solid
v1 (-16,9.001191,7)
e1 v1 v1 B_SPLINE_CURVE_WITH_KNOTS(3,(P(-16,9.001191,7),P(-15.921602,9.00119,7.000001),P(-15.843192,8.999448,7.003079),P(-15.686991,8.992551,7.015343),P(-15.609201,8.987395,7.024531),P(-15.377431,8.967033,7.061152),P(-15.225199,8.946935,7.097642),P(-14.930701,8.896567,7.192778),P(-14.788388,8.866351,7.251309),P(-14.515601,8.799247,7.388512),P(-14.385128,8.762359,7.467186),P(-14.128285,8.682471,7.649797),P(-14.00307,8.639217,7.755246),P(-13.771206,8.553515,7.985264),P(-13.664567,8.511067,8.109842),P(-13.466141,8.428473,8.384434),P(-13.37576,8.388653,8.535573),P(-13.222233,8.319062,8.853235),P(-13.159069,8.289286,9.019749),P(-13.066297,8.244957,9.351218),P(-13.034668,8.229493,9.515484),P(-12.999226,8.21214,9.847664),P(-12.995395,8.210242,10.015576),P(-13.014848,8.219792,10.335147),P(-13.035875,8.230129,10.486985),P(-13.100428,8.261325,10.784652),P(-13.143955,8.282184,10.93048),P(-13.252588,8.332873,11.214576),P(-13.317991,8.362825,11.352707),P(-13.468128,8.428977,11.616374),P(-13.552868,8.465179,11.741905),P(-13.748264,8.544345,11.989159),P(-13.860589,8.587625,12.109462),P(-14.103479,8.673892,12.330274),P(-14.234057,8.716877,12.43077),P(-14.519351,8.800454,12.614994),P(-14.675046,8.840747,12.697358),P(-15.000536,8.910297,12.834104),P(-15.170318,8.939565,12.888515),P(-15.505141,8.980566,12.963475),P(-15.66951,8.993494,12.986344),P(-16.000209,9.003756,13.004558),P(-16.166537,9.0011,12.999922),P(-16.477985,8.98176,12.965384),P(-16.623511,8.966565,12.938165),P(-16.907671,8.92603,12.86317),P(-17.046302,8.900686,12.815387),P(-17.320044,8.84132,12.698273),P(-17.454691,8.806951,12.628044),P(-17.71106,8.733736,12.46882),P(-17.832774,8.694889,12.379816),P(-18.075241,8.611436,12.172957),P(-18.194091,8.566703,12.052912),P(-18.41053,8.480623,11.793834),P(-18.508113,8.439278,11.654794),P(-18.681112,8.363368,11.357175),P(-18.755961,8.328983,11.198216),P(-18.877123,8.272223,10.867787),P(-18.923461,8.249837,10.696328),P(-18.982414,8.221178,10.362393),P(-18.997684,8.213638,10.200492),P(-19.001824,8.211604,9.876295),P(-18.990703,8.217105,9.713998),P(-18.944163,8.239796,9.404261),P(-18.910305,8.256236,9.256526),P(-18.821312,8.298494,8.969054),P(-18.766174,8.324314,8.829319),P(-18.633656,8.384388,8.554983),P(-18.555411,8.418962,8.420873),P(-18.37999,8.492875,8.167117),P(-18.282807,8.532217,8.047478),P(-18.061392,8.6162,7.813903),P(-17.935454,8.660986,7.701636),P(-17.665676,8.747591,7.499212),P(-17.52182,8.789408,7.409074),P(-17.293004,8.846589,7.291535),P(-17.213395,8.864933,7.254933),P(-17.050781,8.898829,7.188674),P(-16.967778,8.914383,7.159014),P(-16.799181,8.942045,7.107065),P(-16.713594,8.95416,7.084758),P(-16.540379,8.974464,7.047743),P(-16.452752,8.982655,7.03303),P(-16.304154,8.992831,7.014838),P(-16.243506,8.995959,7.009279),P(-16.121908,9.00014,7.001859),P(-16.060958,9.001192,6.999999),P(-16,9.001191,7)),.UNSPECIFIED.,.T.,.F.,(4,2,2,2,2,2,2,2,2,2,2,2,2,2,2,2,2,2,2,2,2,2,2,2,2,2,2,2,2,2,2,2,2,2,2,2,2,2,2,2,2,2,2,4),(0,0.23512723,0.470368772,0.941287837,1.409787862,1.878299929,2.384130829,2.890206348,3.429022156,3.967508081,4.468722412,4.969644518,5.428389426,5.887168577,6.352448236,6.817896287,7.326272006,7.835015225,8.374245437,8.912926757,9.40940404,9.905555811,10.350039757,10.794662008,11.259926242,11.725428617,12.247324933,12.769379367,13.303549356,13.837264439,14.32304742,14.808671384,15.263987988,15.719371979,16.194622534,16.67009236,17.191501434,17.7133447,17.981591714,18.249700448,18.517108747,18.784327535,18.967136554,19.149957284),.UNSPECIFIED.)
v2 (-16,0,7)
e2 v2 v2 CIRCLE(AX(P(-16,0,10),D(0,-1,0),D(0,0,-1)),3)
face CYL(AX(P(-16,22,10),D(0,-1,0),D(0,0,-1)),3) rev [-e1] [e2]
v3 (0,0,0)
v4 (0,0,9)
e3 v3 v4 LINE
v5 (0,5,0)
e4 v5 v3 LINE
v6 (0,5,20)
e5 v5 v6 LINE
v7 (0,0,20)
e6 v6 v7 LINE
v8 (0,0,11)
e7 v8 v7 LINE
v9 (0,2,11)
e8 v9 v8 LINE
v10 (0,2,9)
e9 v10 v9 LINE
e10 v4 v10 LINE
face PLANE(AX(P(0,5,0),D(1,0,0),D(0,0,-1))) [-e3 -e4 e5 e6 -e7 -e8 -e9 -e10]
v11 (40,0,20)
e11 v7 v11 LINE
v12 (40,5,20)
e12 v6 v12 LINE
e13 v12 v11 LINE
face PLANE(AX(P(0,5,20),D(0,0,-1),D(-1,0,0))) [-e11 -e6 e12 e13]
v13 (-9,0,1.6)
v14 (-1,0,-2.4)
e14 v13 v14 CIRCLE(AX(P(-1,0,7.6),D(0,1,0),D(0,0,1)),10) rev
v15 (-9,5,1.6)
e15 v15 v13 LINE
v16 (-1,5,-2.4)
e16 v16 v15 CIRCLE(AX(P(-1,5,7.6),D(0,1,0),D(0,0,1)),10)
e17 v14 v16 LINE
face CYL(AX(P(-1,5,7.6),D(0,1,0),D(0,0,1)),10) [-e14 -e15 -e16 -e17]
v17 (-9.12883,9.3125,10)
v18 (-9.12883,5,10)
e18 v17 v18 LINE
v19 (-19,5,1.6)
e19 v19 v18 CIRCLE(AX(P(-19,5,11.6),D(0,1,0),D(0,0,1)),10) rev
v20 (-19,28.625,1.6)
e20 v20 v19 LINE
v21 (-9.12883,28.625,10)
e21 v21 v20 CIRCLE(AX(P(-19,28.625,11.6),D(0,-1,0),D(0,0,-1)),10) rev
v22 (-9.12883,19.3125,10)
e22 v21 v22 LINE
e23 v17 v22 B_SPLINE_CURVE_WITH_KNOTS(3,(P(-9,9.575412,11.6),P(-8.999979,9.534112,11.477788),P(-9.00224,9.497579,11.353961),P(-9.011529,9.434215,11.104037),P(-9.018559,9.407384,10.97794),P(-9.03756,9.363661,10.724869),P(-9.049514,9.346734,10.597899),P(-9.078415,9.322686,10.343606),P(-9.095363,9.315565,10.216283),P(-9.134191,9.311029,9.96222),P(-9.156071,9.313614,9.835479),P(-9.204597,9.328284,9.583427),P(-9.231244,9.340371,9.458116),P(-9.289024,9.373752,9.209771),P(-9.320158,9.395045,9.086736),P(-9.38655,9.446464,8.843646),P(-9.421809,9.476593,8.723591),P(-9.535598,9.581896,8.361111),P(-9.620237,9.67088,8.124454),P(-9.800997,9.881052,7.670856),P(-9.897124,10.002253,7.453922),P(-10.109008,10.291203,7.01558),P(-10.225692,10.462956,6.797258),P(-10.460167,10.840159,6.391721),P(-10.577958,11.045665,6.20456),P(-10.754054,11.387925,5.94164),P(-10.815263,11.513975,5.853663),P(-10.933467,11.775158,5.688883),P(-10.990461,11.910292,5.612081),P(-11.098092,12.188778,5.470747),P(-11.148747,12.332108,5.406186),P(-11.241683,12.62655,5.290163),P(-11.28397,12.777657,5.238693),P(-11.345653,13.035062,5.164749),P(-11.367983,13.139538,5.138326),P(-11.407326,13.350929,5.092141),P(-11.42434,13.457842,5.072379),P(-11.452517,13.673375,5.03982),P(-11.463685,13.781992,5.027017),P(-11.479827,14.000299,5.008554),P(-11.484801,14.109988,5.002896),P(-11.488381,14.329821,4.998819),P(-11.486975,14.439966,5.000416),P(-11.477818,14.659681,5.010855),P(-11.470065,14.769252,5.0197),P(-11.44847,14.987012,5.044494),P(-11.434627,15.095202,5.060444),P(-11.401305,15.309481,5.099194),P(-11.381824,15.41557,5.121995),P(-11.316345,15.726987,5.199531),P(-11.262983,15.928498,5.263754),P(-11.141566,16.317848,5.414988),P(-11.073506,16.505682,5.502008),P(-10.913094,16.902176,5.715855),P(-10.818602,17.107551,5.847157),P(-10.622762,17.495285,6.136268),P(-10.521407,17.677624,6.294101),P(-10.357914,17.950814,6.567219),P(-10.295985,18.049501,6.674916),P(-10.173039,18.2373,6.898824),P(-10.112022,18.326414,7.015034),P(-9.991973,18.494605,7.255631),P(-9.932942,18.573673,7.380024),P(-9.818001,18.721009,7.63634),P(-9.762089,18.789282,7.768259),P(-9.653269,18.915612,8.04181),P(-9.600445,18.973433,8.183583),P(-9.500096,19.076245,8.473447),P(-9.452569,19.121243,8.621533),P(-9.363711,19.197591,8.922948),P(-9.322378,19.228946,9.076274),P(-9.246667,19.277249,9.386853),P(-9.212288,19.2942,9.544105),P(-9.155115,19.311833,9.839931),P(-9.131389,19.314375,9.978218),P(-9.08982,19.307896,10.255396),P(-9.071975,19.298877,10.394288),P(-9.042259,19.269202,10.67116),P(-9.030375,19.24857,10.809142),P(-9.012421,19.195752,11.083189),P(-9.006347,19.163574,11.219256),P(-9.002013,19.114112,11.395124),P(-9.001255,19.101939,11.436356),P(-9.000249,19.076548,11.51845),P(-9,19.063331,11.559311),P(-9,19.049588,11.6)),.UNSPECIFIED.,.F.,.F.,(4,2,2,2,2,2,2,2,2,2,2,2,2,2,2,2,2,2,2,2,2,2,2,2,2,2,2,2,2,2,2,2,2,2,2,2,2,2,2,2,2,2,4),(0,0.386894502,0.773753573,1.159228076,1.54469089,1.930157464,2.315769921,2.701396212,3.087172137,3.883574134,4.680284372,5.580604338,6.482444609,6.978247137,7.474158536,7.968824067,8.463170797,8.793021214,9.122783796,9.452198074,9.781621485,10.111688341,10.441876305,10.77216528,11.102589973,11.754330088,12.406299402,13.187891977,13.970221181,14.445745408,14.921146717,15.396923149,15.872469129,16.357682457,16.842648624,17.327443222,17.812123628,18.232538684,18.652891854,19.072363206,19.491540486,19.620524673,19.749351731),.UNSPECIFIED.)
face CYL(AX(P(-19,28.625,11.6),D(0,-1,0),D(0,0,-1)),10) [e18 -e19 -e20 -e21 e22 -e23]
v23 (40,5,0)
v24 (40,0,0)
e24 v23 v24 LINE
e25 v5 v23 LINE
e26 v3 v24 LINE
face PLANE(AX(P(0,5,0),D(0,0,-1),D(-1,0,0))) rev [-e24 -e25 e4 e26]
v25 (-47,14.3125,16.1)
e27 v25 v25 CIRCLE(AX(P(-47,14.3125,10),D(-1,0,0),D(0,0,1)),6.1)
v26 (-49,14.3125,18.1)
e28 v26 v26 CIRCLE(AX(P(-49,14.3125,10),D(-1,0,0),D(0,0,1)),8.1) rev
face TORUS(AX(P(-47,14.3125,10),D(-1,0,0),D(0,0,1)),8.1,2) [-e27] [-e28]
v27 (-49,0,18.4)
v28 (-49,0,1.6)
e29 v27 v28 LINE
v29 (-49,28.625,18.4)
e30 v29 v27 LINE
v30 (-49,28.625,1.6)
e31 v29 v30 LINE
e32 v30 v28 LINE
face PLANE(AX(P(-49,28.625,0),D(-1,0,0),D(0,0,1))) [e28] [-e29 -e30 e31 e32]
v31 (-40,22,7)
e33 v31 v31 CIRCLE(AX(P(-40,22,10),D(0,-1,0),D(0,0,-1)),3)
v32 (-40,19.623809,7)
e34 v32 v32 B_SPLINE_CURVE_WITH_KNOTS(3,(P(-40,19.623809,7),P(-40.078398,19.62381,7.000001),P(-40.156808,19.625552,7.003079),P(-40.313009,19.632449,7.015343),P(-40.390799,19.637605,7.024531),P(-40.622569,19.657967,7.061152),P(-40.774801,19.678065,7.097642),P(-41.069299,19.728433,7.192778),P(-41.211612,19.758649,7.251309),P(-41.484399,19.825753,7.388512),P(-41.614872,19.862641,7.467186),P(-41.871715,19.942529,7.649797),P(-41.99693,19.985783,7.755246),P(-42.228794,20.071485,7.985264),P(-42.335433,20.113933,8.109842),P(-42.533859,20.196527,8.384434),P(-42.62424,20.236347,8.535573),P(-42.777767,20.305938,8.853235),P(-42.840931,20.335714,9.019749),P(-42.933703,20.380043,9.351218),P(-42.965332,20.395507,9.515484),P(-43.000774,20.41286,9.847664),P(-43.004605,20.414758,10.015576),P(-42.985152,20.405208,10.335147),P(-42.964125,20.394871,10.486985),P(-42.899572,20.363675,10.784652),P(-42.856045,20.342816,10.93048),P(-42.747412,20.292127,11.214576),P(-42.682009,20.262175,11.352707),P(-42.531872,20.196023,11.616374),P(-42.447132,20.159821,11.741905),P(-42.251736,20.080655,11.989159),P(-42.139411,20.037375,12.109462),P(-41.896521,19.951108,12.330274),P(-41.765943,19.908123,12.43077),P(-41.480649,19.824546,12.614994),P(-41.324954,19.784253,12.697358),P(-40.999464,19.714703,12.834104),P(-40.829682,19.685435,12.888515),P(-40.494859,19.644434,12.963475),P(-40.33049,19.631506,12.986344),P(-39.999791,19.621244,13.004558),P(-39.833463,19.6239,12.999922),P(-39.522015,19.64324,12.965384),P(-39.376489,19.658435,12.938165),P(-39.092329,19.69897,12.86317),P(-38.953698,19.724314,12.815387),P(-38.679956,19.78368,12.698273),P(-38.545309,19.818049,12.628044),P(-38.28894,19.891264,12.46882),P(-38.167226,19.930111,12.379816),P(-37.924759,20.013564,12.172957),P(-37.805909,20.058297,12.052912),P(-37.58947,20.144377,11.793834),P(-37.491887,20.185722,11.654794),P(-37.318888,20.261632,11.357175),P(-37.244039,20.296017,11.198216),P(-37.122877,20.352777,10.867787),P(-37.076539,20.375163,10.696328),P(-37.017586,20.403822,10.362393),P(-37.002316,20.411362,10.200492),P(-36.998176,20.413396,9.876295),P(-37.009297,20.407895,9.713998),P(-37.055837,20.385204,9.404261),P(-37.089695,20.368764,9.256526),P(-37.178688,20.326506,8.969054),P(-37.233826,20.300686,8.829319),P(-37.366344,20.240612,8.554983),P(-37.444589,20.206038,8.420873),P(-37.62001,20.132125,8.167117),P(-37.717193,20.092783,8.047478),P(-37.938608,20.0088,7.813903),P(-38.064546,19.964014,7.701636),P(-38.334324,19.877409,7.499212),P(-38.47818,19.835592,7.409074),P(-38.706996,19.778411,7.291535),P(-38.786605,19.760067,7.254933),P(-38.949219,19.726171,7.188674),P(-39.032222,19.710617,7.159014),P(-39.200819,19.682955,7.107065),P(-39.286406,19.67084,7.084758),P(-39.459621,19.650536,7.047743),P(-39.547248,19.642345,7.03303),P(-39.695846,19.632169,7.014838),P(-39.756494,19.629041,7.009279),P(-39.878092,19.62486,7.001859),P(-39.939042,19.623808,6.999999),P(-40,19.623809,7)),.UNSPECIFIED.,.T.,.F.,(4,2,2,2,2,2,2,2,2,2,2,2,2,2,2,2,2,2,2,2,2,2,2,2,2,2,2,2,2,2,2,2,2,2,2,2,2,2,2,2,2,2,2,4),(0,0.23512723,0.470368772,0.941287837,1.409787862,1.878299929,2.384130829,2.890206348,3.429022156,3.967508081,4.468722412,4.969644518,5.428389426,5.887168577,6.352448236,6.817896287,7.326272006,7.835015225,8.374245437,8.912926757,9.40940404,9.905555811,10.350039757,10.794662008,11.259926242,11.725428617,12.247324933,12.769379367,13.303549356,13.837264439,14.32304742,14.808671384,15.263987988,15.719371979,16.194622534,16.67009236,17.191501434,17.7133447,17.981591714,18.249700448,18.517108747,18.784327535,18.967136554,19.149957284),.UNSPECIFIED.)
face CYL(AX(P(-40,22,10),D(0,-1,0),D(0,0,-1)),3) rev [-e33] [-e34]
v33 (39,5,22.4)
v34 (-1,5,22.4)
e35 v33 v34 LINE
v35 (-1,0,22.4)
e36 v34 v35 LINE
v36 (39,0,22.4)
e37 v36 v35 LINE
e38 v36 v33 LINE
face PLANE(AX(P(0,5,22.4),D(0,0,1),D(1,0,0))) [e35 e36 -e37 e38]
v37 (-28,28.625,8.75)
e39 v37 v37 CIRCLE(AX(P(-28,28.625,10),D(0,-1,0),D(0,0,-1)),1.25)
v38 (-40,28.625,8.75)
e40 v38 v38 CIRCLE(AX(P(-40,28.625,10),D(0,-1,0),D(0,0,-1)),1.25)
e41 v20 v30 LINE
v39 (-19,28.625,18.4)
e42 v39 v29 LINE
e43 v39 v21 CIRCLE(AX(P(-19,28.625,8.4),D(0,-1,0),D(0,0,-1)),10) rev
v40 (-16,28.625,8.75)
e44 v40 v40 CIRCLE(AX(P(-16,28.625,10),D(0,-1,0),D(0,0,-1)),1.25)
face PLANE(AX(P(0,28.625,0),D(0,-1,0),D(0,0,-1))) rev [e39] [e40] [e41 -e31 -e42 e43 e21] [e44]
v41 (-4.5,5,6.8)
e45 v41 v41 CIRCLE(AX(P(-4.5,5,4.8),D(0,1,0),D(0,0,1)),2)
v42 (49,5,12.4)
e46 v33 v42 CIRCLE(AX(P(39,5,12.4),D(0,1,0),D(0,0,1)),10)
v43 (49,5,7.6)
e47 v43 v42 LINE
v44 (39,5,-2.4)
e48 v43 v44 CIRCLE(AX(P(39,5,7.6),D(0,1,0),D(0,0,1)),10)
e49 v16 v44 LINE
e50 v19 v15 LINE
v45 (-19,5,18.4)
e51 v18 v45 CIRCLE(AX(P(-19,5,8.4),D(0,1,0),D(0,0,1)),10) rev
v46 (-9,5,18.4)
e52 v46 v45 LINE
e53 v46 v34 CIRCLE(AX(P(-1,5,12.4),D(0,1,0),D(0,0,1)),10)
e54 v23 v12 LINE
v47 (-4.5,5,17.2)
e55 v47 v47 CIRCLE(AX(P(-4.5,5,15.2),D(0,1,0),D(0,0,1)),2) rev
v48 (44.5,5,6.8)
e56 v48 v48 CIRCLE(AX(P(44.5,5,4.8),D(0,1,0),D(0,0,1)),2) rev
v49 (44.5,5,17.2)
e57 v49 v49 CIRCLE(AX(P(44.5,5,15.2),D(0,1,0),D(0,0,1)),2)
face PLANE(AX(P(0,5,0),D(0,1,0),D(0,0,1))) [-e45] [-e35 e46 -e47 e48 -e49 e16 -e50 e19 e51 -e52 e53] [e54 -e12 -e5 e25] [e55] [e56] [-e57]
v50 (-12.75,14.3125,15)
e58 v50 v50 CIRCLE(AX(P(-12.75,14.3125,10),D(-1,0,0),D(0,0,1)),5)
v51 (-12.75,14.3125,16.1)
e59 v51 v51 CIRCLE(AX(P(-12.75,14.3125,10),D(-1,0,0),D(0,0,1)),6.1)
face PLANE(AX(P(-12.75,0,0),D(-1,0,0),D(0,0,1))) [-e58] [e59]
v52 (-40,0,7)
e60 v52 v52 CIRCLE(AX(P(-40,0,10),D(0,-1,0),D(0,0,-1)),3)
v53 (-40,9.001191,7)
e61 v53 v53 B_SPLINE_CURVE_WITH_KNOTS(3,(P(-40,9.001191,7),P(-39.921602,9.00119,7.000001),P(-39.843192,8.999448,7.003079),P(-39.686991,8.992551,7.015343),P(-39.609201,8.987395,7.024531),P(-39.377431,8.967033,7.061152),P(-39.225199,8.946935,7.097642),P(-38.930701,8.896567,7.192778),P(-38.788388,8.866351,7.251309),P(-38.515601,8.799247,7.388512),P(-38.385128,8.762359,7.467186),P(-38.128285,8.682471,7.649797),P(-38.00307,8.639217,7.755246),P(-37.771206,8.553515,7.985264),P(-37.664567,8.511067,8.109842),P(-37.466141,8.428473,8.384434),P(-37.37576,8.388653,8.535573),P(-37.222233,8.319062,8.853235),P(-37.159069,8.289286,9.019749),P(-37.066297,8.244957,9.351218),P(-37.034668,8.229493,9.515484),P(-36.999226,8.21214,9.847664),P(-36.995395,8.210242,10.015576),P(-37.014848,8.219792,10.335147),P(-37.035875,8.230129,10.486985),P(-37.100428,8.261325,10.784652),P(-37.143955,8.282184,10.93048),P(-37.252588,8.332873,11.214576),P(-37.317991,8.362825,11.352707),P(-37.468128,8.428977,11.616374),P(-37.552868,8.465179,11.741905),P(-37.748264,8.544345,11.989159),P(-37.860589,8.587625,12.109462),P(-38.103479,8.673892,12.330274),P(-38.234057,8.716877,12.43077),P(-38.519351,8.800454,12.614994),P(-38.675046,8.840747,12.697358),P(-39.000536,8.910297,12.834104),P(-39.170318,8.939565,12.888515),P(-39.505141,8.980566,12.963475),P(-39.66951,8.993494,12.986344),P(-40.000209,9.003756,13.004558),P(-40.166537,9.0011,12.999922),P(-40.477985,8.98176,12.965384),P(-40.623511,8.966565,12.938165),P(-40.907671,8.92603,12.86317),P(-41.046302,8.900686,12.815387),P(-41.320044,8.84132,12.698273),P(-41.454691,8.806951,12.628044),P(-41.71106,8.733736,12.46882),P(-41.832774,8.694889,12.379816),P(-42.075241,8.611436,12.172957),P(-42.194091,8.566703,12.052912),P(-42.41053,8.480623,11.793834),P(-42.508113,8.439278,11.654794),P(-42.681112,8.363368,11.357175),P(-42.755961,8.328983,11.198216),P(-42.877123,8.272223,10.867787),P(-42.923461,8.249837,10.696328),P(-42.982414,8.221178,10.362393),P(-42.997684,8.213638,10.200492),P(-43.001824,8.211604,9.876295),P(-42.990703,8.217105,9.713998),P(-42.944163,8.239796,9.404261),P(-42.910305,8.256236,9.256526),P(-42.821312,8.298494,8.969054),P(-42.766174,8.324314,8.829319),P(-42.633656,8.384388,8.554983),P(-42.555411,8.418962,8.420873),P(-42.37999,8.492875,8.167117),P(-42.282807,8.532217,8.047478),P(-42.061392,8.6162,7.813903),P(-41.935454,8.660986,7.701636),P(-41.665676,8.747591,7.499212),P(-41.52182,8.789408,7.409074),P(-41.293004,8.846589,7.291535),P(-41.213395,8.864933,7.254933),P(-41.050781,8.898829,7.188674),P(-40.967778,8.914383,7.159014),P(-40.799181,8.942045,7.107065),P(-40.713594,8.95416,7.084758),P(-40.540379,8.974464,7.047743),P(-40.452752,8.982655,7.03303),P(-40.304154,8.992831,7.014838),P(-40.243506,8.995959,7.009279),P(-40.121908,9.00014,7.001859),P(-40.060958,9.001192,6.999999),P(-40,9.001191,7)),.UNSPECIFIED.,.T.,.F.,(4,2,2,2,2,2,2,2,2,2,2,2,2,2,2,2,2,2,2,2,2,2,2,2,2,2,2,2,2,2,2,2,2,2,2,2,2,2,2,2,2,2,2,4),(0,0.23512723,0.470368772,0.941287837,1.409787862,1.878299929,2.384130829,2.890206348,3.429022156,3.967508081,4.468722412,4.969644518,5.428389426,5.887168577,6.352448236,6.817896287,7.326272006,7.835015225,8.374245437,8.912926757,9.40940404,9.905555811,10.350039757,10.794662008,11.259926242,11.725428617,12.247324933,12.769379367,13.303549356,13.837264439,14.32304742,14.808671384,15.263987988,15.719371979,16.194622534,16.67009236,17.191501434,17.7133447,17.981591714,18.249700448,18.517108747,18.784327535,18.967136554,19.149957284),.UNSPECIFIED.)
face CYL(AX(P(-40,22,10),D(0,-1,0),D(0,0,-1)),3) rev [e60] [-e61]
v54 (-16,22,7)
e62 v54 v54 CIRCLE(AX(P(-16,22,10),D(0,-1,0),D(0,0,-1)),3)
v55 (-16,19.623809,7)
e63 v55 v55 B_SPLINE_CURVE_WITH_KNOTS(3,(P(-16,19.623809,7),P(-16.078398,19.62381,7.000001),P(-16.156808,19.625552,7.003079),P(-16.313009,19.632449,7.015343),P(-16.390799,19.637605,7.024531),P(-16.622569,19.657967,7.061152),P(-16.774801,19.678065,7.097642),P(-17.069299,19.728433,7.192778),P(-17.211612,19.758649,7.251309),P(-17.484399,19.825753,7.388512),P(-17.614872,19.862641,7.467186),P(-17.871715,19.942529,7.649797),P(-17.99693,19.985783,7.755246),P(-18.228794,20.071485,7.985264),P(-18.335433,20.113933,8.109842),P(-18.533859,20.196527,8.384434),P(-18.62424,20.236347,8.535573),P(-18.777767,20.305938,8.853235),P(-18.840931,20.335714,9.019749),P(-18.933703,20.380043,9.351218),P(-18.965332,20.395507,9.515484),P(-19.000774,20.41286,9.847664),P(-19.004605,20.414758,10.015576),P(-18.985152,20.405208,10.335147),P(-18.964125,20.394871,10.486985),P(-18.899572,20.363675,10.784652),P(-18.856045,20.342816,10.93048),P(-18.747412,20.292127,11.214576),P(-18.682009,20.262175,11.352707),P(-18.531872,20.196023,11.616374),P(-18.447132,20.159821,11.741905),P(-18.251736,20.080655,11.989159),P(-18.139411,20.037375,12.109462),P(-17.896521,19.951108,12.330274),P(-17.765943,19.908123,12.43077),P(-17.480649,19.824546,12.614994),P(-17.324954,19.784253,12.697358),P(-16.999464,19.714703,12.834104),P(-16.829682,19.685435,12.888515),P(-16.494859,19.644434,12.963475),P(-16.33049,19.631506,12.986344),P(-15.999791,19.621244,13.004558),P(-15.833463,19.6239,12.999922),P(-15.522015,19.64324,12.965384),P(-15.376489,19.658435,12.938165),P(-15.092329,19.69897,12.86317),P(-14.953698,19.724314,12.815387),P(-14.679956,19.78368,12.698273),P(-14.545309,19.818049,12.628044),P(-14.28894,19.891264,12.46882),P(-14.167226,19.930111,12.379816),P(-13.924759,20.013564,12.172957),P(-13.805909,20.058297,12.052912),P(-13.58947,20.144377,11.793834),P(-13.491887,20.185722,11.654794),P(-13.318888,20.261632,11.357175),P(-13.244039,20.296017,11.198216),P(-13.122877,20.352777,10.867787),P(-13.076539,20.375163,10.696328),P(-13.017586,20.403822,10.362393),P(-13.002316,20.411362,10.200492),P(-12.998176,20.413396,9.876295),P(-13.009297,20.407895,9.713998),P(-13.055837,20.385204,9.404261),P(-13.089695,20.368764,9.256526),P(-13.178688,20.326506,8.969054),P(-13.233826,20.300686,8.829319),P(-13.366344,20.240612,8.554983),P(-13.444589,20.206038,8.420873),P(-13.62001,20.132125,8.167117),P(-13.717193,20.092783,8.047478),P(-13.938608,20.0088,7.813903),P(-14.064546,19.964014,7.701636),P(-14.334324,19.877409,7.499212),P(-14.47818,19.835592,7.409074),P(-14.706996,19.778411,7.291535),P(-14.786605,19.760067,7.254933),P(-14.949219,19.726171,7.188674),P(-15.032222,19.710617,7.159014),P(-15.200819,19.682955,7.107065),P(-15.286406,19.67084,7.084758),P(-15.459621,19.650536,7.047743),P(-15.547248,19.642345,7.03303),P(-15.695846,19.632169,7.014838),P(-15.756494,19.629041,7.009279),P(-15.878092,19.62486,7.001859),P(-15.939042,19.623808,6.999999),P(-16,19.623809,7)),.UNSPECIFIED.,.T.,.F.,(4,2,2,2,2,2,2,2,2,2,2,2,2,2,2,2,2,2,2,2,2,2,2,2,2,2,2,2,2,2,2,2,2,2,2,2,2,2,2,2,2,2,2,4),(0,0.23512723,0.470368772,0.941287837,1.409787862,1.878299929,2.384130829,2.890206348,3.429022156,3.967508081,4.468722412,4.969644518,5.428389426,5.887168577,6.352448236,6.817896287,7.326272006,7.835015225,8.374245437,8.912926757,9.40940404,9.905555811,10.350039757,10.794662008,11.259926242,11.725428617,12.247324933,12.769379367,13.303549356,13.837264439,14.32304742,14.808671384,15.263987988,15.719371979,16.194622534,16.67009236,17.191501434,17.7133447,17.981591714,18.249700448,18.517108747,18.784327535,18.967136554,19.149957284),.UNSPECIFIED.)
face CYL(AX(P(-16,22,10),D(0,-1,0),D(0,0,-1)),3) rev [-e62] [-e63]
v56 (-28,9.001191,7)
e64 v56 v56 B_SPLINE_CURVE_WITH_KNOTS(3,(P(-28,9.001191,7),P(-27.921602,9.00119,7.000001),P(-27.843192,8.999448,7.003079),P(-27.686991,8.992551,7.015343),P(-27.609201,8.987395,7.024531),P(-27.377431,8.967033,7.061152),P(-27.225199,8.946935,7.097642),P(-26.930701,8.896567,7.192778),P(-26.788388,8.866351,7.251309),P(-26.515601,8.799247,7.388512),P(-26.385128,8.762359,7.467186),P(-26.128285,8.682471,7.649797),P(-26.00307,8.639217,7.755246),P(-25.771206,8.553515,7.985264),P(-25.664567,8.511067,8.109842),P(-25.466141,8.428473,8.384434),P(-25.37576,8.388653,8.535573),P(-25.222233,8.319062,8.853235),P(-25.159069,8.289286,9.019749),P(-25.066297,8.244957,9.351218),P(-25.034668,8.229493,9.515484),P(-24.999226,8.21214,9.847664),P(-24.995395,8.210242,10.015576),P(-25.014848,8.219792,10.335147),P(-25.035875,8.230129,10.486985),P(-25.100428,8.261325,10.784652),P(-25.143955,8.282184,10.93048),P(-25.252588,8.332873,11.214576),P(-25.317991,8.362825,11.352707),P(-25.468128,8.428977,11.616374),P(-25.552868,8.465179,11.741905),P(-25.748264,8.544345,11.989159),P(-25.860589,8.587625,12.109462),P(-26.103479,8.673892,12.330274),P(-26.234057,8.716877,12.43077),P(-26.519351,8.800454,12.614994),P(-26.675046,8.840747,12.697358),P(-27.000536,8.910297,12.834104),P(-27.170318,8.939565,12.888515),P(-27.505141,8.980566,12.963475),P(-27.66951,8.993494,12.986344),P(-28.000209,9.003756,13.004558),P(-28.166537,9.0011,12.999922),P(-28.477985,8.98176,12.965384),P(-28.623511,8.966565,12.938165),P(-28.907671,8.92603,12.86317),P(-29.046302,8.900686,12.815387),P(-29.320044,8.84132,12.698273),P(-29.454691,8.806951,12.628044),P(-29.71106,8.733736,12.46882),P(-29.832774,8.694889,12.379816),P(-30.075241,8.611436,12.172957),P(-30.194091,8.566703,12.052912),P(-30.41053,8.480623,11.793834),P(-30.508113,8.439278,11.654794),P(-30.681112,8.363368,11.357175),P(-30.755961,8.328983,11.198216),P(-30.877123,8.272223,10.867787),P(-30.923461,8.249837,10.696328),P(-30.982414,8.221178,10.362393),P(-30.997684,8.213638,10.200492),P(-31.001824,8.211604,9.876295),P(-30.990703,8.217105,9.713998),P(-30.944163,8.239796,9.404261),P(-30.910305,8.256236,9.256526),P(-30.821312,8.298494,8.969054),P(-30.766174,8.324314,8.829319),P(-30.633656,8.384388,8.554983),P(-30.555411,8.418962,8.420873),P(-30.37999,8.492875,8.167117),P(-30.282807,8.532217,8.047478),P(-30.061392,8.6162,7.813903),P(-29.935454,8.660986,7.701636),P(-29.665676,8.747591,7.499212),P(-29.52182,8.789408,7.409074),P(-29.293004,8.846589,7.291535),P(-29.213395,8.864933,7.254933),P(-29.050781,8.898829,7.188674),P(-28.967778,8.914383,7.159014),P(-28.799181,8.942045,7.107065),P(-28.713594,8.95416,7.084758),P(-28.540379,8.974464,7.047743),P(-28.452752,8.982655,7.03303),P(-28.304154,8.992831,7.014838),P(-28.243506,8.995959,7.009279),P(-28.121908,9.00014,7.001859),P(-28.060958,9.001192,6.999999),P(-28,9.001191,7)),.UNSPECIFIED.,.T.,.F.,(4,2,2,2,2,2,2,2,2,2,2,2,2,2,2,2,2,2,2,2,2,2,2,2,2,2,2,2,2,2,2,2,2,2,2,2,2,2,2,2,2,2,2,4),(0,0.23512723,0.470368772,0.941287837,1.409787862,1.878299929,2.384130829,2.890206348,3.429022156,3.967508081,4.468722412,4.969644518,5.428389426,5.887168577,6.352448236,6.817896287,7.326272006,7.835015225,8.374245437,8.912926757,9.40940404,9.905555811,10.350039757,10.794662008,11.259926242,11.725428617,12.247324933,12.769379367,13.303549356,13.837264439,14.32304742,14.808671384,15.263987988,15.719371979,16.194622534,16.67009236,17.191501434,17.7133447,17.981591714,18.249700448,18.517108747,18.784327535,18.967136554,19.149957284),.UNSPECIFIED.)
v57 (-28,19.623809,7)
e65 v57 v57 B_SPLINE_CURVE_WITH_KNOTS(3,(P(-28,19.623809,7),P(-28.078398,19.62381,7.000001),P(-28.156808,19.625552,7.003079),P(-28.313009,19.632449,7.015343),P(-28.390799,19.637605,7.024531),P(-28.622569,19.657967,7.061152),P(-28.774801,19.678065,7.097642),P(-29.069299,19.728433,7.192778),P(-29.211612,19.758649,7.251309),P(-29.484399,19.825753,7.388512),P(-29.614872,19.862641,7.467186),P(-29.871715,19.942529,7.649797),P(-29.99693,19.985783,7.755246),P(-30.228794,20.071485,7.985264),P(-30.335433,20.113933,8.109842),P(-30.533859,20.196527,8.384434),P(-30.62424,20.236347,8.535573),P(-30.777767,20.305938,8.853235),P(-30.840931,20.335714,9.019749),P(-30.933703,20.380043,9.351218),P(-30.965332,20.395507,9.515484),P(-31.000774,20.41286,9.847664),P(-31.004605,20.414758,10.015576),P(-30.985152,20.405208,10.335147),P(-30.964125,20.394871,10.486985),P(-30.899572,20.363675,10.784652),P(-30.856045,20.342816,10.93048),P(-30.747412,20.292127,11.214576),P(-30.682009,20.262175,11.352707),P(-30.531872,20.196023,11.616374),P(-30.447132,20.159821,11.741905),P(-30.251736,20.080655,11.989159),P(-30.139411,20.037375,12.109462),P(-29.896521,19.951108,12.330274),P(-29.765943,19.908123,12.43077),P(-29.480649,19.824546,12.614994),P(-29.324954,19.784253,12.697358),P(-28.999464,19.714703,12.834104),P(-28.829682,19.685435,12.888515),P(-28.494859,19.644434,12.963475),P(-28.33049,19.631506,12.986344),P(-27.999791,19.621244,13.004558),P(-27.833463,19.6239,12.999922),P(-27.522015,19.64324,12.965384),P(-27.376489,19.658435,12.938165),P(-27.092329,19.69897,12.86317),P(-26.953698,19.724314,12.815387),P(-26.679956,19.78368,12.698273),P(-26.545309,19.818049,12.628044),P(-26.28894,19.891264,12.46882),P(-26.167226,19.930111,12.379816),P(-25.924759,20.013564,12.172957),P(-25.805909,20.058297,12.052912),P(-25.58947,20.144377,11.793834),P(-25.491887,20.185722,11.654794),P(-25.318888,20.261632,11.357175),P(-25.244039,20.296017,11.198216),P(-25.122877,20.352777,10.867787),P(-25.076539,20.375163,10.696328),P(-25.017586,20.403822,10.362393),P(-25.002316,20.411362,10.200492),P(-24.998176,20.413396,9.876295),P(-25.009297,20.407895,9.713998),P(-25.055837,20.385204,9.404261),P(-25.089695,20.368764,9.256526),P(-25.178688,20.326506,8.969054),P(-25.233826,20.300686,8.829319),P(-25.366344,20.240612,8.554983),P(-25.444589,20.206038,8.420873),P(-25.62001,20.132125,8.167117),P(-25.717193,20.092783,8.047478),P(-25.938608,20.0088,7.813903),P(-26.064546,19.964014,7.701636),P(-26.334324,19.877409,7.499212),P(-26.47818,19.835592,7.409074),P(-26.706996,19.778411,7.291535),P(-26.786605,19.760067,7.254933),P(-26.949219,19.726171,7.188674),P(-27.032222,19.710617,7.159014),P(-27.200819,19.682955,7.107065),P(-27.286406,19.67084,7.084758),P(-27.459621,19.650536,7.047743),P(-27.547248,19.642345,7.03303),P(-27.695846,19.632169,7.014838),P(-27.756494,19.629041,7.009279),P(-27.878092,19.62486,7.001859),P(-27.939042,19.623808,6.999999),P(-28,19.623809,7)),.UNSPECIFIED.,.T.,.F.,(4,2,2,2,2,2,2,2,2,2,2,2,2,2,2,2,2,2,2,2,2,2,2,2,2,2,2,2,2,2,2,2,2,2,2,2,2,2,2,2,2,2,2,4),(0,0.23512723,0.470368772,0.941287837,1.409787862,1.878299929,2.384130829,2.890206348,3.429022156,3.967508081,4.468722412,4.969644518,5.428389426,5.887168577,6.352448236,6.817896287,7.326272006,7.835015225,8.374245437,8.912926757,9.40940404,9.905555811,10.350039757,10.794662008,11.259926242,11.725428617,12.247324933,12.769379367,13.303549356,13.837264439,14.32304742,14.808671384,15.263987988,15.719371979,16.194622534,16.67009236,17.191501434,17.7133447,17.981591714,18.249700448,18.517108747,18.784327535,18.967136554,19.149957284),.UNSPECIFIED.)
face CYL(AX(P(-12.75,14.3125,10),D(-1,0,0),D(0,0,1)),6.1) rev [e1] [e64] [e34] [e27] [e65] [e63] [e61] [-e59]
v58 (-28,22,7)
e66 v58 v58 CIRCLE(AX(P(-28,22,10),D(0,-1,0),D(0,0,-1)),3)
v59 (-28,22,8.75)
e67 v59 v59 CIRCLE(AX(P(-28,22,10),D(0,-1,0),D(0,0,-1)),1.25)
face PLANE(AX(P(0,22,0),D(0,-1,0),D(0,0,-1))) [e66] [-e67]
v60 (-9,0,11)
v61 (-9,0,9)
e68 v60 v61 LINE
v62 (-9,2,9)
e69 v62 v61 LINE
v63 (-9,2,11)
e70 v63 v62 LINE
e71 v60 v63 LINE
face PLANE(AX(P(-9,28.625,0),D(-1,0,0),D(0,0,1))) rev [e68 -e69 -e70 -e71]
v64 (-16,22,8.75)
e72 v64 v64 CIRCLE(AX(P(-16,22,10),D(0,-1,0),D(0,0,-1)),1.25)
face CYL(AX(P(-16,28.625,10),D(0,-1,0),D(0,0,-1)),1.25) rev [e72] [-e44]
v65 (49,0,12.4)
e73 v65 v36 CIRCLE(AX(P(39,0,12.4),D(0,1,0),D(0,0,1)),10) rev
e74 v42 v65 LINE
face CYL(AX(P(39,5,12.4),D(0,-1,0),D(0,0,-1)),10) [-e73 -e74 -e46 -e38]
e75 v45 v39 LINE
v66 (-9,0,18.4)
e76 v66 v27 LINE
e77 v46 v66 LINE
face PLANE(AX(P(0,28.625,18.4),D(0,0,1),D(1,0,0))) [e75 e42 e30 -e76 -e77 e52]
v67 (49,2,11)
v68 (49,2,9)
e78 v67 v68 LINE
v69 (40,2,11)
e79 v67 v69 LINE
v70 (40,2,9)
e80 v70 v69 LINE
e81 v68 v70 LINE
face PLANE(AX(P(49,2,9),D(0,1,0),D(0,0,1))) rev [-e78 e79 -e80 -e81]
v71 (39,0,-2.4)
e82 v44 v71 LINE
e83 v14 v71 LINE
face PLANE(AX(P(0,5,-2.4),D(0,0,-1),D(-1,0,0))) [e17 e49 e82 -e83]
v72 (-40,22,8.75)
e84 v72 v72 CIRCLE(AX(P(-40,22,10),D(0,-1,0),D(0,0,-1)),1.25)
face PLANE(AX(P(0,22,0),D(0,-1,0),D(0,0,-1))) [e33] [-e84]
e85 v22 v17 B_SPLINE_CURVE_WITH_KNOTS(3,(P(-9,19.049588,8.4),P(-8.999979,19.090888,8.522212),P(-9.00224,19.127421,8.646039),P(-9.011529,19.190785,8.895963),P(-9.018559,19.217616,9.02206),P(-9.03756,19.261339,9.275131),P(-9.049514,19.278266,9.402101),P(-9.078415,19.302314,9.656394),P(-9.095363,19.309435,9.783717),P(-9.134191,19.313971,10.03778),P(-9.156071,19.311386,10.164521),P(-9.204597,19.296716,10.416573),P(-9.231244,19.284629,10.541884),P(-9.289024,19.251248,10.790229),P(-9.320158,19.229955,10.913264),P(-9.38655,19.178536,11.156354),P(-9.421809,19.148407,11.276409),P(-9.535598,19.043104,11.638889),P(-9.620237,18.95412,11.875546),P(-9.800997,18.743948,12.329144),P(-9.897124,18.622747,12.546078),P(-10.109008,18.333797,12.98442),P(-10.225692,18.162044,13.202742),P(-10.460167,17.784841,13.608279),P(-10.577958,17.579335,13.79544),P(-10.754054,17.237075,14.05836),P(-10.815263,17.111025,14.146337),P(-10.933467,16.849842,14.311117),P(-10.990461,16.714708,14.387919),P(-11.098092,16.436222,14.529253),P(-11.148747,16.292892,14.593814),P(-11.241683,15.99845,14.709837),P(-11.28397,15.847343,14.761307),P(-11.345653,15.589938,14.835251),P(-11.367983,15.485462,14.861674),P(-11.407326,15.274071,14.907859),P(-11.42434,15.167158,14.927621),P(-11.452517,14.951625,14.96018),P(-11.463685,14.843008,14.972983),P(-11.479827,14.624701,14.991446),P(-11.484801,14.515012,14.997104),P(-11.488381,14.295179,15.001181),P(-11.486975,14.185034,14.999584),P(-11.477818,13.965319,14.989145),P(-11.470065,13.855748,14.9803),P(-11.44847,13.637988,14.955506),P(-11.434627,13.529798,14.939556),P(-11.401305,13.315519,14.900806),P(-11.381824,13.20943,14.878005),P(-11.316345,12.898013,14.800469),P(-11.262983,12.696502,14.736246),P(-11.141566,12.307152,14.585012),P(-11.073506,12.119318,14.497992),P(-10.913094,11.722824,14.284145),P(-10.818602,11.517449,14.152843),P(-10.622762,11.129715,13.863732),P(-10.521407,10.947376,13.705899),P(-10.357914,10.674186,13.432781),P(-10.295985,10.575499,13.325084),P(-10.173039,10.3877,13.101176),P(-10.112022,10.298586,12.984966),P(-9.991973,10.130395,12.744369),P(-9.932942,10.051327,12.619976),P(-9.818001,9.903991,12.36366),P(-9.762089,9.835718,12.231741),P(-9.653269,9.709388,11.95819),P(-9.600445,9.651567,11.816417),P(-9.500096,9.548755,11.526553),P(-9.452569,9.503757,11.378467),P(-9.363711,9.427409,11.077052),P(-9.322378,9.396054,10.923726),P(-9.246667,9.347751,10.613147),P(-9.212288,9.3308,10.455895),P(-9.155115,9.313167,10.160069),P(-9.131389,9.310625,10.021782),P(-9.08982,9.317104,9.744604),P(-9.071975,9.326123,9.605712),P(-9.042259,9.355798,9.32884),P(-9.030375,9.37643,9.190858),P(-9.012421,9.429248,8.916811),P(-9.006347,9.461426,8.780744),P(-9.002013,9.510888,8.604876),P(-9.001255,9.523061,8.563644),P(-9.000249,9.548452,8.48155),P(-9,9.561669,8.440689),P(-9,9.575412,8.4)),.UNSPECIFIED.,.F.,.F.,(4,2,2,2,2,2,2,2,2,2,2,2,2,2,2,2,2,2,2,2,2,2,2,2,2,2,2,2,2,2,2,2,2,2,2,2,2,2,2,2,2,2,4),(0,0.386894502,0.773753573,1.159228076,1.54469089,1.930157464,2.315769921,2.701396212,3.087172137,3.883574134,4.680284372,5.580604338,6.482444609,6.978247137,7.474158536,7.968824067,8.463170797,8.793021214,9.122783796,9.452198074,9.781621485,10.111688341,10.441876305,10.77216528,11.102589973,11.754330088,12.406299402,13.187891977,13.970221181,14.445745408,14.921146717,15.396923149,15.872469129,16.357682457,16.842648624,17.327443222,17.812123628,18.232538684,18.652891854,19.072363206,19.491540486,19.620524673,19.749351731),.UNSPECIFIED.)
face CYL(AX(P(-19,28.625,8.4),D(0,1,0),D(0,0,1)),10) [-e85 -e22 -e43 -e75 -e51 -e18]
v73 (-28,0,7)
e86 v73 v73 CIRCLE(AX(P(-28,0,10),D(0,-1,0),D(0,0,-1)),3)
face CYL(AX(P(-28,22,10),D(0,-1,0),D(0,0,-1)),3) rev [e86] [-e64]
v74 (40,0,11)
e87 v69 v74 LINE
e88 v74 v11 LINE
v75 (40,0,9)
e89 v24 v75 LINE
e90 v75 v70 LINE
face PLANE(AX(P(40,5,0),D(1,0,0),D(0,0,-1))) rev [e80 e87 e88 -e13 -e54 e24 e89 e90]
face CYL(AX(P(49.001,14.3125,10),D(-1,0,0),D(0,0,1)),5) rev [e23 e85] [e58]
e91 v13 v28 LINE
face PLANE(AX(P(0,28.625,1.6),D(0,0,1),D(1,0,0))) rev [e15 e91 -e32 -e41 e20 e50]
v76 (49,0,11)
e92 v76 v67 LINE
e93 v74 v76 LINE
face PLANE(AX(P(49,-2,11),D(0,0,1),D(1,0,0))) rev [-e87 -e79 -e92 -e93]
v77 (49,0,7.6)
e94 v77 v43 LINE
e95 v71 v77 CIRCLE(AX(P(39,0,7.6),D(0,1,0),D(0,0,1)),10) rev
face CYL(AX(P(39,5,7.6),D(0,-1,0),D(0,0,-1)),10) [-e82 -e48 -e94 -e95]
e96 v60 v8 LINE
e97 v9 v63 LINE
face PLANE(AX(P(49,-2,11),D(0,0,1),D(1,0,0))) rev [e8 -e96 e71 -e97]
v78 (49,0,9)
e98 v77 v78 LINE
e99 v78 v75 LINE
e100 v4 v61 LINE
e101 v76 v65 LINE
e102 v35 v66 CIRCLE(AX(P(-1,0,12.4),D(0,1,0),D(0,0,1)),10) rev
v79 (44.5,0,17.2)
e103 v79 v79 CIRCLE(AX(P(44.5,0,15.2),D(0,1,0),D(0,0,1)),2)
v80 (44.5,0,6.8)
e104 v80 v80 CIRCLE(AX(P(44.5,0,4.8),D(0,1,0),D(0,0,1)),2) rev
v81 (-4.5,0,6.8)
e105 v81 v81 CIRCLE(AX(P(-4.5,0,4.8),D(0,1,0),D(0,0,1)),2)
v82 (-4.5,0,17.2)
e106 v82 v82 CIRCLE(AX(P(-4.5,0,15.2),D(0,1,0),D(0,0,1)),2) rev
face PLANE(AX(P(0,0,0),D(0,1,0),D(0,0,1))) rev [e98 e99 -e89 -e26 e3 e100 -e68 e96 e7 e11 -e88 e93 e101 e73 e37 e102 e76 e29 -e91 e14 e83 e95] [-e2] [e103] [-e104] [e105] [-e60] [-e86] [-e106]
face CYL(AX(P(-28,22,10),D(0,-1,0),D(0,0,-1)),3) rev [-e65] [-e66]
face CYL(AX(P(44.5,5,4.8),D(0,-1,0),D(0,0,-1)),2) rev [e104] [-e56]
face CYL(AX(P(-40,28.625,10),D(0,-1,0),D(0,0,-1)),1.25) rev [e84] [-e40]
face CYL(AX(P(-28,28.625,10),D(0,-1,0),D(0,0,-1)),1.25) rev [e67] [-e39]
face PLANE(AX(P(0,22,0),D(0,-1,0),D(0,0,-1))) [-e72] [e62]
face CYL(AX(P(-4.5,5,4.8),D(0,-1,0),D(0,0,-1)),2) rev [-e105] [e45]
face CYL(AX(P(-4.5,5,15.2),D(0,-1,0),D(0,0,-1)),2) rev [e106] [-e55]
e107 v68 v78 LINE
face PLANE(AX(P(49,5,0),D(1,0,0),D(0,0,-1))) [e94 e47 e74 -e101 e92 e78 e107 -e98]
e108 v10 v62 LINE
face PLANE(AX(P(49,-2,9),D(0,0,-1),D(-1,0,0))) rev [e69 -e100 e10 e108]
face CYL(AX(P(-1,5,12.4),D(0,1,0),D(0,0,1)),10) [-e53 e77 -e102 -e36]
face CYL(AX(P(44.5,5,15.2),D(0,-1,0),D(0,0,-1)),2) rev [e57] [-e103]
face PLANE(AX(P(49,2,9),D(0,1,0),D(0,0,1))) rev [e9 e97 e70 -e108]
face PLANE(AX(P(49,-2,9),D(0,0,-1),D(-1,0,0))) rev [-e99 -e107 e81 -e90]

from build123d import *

# Parameters (mm, degrees)
SKETCH1_R           = 2
BOSS_EXTRUDE1_DEPTH = 5
SKETCH2_W           = 2
SKETCH2_H           = 4
CUT_EXTRUDE1_DEPTH  = 63.375956906
BOSS_EXTRUDE2_DEPTH = 28.625
FILLET1_R           = 10
CUT_EXTRUDE2_DEPTH  = 36.25
CUT_EXTRUDE3_REACH  = 73.653
SKETCH5_R           = 5
FILLET4_R           = 10
SKETCH8_R           = 3
CUT_EXTRUDE6_DEPTH  = 22
SKETCH9_R           = 1.25
CUT_EXTRUDE7_DEPTH  = 59.195876265
FILLET5_R           = 2


with BuildPart() as part:
    # Sketch1 → Boss-Extrude1 (new body)
    with BuildSketch(Plane(origin=(0, 0, 0), x_dir=(1, 0, 0), z_dir=(0, 1, 0))):
        Polygon((-9, 2.4), (-9, 0), (-9, -22.4), (49, -22.4), (49, 2.4), align=None)
        with Locations(Location((-4.5, -15.2, 0), (0, 0, 270))):
            Circle(SKETCH1_R, mode=Mode.SUBTRACT)
        with Locations(Location((44.5, -15.2, 0), (0, 0, 270))):
            Circle(SKETCH1_R, mode=Mode.SUBTRACT)
        with Locations(Location((-4.5, -4.8, 0), (0, 0, 270))):
            Circle(SKETCH1_R, mode=Mode.SUBTRACT)
        Polygon((0, -4.8), (0, 0), (20, 0), (40, 0), (40, -10), (40, -20), (20, -20), (0, -20), (0, -10), align=None, mode=Mode.SUBTRACT)
        with Locations(Location((44.5, -4.8, 0), (0, 0, 270))):
            Circle(SKETCH1_R, mode=Mode.SUBTRACT)
    extrude(amount=BOSS_EXTRUDE1_DEPTH)

    # Sketch2 → Cut-Extrude1 (cut, through all)
    with BuildSketch(Plane.ZY.offset(9)):
        with Locations((10, 0)):
            Rectangle(SKETCH2_W, SKETCH2_H)
    extrude(amount=-CUT_EXTRUDE1_DEPTH, mode=Mode.SUBTRACT)

    # Sketch3 → Boss-Extrude2 (add)
    with BuildSketch(Plane.XZ):
        Polygon((-9, 1.6), (-9, 10), (-9, 11), (-9, 18.4), (-49, 18.4), (-49, 1.6), align=None)
    extrude(amount=-BOSS_EXTRUDE2_DEPTH)

    # Fillet1
    # the kernel refuses this fillet: 10 mm, written as the material it takes off along each edge
    with BuildSketch(Plane(origin=(-9, -20, 22.4), x_dir=(0, 0, -1), z_dir=(0, 1, 0))) as fillet1_piece_1:
        with BuildLine():
            CenterArc((10, -8), FILLET1_R, 126.869897646, 53.130102354)
            Line((0, -8), (-0.2, -8))
            Line((-0.2, -8), (-0.2, 0))
            Line((-0.2, 0), (0, 0.2))
            ThreePointArc((0, 0.2), (2, 0.2), (3.88, 0.16))
            Line((3.88, 0.16), (4, 0))
        make_face()
    extrude(amount=45, mode=Mode.SUBTRACT)
    with BuildSketch(Plane(origin=(-9, -20, -2.4), x_dir=(0, 0, 1), z_dir=(0, 1, 0))) as fillet1_piece_2:
        with BuildLine():
            CenterArc((10, 8), FILLET1_R, 180, 53.130102354)
            Line((0, 8), (-0.2, 8))
            Line((-0.2, 8), (-0.2, 0))
            Line((-0.2, 0), (0, -0.2))
            ThreePointArc((0, -0.2), (2, -0.2), (3.88, -0.16))
            Line((3.88, -0.16), (4, 0))
        make_face()
    extrude(amount=45, mode=Mode.SUBTRACT)
    with BuildSketch(Plane(origin=(49, -25, -2.4), x_dir=(-1, 0, 0), z_dir=(0, 1, 0)), Plane(origin=(49, -25, 22.4), x_dir=(0, 0, -1), z_dir=(0, 1, 0))) as fillet1_piece_3:
        with BuildLine():
            CenterArc((FILLET1_R, FILLET1_R), FILLET1_R, 180, 90)
            Line((0, FILLET1_R), (-FILLET1_R * 0.02, FILLET1_R))
            Line((-FILLET1_R * 0.02, FILLET1_R), (-FILLET1_R * 0.02, -FILLET1_R * 0.02))
            Line((-FILLET1_R * 0.02, -FILLET1_R * 0.02), (FILLET1_R, -FILLET1_R * 0.02))
            Line((FILLET1_R, -FILLET1_R * 0.02), (FILLET1_R, 0))
        make_face()
    extrude(amount=55, mode=Mode.SUBTRACT)

    # Sketch4 → Cut-Extrude2 (cut)
    with BuildSketch(Plane.ZY.offset(49)):
        with BuildLine():
            ThreePointArc((16.1, 14.3125), (13.031141398, 19.606098193), (6.912399402, 19.573367091))
            Line((6.912399402, 19.573367091), (13.087600598, 9.051632909))
            ThreePointArc((13.087600598, 9.051632909), (15.293598193, 11.281358602), (16.1, 14.3125))
        make_face()
        with BuildLine():
            Line((13.087600598, 9.051632909), (6.912399402, 19.573367091))
            ThreePointArc((6.912399402, 19.573367091), (4.739132909, 11.224899402), (13.087600598, 9.051632909))
        make_face()
    extrude(amount=-CUT_EXTRUDE2_DEPTH, mode=Mode.SUBTRACT)

    # Sketch5 → Cut-Extrude3 (cut, up to next)
    with BuildSketch(Plane.ZY.offset(12.75), mode=Mode.PRIVATE) as cut_extrude3_sk1:
        with Locations((10, 14.3125)):
            Circle(SKETCH5_R)
    cut_extrude3_tool1 = extrude(cut_extrude3_sk1.sketch, amount=-CUT_EXTRUDE3_REACH, mode=Mode.PRIVATE) & part.part
    add(cut_extrude3_tool1.solids().sort_by_distance((-12.75, 14.3125, 10))[0], mode=Mode.SUBTRACT)

    # Fillet4
    # the kernel refuses this fillet: 10 mm, written as the material it takes off along each edge
    with BuildSketch(Plane(origin=(-9, 53.625, 1.6), x_dir=(-1, 0, 0), z_dir=(0, -1, 0))) as fillet4_piece_1:
        with BuildLine():
            CenterArc((FILLET4_R, -FILLET4_R), FILLET4_R, 90, 90)
            Line((0, -FILLET4_R), (0, 0))
            Line((0, 0), (FILLET4_R, 0))
        make_face()
    extrude(amount=48.625, mode=Mode.SUBTRACT)
    with BuildSketch(Plane(origin=(-9, 5, 18.4), x_dir=(0, 0, -1), z_dir=(0, 1, 0))) as fillet4_piece_2:
        with BuildLine():
            CenterArc((FILLET4_R, FILLET4_R), FILLET4_R, 180, 90)
            Line((0, FILLET4_R), (0, 0))
            Line((0, 0), (FILLET4_R, 0))
        make_face()
    extrude(amount=48.625, mode=Mode.SUBTRACT)

    # Sketch8 → Cut-Extrude6 (cut)
    with BuildSketch(Plane.XZ):
        with Locations(Location((-40, 10, 0), (0, 0, 270))):
            Circle(SKETCH8_R)
        with Locations(Location((-28, 10, 0), (0, 0, 270))):
            Circle(SKETCH8_R)
        with Locations(Location((-16, 10, 0), (0, 0, 270))):
            Circle(SKETCH8_R)
    extrude(amount=-CUT_EXTRUDE6_DEPTH, mode=Mode.SUBTRACT)

    # Sketch9 → Cut-Extrude7 (cut, through all)
    with BuildSketch(Plane.XZ.offset(-22)):
        with Locations(Location((-40, 10, 0), (0, 0, 270))):
            Circle(SKETCH9_R)
        with Locations(Location((-28, 10, 0), (0, 0, 270))):
            Circle(SKETCH9_R)
        with Locations(Location((-16, 10, 0), (0, 0, 270))):
            Circle(SKETCH9_R)
    extrude(amount=-CUT_EXTRUDE7_DEPTH, mode=Mode.SUBTRACT)

    # Fillet5
    fillet5_edges = [part.edges().sort_by_distance(p)[0] for p in [
        (-49, 9.051632909, 13.087600598),
    ]]
    fillet(fillet5_edges, radius=FILLET5_R)


solid = part.part
